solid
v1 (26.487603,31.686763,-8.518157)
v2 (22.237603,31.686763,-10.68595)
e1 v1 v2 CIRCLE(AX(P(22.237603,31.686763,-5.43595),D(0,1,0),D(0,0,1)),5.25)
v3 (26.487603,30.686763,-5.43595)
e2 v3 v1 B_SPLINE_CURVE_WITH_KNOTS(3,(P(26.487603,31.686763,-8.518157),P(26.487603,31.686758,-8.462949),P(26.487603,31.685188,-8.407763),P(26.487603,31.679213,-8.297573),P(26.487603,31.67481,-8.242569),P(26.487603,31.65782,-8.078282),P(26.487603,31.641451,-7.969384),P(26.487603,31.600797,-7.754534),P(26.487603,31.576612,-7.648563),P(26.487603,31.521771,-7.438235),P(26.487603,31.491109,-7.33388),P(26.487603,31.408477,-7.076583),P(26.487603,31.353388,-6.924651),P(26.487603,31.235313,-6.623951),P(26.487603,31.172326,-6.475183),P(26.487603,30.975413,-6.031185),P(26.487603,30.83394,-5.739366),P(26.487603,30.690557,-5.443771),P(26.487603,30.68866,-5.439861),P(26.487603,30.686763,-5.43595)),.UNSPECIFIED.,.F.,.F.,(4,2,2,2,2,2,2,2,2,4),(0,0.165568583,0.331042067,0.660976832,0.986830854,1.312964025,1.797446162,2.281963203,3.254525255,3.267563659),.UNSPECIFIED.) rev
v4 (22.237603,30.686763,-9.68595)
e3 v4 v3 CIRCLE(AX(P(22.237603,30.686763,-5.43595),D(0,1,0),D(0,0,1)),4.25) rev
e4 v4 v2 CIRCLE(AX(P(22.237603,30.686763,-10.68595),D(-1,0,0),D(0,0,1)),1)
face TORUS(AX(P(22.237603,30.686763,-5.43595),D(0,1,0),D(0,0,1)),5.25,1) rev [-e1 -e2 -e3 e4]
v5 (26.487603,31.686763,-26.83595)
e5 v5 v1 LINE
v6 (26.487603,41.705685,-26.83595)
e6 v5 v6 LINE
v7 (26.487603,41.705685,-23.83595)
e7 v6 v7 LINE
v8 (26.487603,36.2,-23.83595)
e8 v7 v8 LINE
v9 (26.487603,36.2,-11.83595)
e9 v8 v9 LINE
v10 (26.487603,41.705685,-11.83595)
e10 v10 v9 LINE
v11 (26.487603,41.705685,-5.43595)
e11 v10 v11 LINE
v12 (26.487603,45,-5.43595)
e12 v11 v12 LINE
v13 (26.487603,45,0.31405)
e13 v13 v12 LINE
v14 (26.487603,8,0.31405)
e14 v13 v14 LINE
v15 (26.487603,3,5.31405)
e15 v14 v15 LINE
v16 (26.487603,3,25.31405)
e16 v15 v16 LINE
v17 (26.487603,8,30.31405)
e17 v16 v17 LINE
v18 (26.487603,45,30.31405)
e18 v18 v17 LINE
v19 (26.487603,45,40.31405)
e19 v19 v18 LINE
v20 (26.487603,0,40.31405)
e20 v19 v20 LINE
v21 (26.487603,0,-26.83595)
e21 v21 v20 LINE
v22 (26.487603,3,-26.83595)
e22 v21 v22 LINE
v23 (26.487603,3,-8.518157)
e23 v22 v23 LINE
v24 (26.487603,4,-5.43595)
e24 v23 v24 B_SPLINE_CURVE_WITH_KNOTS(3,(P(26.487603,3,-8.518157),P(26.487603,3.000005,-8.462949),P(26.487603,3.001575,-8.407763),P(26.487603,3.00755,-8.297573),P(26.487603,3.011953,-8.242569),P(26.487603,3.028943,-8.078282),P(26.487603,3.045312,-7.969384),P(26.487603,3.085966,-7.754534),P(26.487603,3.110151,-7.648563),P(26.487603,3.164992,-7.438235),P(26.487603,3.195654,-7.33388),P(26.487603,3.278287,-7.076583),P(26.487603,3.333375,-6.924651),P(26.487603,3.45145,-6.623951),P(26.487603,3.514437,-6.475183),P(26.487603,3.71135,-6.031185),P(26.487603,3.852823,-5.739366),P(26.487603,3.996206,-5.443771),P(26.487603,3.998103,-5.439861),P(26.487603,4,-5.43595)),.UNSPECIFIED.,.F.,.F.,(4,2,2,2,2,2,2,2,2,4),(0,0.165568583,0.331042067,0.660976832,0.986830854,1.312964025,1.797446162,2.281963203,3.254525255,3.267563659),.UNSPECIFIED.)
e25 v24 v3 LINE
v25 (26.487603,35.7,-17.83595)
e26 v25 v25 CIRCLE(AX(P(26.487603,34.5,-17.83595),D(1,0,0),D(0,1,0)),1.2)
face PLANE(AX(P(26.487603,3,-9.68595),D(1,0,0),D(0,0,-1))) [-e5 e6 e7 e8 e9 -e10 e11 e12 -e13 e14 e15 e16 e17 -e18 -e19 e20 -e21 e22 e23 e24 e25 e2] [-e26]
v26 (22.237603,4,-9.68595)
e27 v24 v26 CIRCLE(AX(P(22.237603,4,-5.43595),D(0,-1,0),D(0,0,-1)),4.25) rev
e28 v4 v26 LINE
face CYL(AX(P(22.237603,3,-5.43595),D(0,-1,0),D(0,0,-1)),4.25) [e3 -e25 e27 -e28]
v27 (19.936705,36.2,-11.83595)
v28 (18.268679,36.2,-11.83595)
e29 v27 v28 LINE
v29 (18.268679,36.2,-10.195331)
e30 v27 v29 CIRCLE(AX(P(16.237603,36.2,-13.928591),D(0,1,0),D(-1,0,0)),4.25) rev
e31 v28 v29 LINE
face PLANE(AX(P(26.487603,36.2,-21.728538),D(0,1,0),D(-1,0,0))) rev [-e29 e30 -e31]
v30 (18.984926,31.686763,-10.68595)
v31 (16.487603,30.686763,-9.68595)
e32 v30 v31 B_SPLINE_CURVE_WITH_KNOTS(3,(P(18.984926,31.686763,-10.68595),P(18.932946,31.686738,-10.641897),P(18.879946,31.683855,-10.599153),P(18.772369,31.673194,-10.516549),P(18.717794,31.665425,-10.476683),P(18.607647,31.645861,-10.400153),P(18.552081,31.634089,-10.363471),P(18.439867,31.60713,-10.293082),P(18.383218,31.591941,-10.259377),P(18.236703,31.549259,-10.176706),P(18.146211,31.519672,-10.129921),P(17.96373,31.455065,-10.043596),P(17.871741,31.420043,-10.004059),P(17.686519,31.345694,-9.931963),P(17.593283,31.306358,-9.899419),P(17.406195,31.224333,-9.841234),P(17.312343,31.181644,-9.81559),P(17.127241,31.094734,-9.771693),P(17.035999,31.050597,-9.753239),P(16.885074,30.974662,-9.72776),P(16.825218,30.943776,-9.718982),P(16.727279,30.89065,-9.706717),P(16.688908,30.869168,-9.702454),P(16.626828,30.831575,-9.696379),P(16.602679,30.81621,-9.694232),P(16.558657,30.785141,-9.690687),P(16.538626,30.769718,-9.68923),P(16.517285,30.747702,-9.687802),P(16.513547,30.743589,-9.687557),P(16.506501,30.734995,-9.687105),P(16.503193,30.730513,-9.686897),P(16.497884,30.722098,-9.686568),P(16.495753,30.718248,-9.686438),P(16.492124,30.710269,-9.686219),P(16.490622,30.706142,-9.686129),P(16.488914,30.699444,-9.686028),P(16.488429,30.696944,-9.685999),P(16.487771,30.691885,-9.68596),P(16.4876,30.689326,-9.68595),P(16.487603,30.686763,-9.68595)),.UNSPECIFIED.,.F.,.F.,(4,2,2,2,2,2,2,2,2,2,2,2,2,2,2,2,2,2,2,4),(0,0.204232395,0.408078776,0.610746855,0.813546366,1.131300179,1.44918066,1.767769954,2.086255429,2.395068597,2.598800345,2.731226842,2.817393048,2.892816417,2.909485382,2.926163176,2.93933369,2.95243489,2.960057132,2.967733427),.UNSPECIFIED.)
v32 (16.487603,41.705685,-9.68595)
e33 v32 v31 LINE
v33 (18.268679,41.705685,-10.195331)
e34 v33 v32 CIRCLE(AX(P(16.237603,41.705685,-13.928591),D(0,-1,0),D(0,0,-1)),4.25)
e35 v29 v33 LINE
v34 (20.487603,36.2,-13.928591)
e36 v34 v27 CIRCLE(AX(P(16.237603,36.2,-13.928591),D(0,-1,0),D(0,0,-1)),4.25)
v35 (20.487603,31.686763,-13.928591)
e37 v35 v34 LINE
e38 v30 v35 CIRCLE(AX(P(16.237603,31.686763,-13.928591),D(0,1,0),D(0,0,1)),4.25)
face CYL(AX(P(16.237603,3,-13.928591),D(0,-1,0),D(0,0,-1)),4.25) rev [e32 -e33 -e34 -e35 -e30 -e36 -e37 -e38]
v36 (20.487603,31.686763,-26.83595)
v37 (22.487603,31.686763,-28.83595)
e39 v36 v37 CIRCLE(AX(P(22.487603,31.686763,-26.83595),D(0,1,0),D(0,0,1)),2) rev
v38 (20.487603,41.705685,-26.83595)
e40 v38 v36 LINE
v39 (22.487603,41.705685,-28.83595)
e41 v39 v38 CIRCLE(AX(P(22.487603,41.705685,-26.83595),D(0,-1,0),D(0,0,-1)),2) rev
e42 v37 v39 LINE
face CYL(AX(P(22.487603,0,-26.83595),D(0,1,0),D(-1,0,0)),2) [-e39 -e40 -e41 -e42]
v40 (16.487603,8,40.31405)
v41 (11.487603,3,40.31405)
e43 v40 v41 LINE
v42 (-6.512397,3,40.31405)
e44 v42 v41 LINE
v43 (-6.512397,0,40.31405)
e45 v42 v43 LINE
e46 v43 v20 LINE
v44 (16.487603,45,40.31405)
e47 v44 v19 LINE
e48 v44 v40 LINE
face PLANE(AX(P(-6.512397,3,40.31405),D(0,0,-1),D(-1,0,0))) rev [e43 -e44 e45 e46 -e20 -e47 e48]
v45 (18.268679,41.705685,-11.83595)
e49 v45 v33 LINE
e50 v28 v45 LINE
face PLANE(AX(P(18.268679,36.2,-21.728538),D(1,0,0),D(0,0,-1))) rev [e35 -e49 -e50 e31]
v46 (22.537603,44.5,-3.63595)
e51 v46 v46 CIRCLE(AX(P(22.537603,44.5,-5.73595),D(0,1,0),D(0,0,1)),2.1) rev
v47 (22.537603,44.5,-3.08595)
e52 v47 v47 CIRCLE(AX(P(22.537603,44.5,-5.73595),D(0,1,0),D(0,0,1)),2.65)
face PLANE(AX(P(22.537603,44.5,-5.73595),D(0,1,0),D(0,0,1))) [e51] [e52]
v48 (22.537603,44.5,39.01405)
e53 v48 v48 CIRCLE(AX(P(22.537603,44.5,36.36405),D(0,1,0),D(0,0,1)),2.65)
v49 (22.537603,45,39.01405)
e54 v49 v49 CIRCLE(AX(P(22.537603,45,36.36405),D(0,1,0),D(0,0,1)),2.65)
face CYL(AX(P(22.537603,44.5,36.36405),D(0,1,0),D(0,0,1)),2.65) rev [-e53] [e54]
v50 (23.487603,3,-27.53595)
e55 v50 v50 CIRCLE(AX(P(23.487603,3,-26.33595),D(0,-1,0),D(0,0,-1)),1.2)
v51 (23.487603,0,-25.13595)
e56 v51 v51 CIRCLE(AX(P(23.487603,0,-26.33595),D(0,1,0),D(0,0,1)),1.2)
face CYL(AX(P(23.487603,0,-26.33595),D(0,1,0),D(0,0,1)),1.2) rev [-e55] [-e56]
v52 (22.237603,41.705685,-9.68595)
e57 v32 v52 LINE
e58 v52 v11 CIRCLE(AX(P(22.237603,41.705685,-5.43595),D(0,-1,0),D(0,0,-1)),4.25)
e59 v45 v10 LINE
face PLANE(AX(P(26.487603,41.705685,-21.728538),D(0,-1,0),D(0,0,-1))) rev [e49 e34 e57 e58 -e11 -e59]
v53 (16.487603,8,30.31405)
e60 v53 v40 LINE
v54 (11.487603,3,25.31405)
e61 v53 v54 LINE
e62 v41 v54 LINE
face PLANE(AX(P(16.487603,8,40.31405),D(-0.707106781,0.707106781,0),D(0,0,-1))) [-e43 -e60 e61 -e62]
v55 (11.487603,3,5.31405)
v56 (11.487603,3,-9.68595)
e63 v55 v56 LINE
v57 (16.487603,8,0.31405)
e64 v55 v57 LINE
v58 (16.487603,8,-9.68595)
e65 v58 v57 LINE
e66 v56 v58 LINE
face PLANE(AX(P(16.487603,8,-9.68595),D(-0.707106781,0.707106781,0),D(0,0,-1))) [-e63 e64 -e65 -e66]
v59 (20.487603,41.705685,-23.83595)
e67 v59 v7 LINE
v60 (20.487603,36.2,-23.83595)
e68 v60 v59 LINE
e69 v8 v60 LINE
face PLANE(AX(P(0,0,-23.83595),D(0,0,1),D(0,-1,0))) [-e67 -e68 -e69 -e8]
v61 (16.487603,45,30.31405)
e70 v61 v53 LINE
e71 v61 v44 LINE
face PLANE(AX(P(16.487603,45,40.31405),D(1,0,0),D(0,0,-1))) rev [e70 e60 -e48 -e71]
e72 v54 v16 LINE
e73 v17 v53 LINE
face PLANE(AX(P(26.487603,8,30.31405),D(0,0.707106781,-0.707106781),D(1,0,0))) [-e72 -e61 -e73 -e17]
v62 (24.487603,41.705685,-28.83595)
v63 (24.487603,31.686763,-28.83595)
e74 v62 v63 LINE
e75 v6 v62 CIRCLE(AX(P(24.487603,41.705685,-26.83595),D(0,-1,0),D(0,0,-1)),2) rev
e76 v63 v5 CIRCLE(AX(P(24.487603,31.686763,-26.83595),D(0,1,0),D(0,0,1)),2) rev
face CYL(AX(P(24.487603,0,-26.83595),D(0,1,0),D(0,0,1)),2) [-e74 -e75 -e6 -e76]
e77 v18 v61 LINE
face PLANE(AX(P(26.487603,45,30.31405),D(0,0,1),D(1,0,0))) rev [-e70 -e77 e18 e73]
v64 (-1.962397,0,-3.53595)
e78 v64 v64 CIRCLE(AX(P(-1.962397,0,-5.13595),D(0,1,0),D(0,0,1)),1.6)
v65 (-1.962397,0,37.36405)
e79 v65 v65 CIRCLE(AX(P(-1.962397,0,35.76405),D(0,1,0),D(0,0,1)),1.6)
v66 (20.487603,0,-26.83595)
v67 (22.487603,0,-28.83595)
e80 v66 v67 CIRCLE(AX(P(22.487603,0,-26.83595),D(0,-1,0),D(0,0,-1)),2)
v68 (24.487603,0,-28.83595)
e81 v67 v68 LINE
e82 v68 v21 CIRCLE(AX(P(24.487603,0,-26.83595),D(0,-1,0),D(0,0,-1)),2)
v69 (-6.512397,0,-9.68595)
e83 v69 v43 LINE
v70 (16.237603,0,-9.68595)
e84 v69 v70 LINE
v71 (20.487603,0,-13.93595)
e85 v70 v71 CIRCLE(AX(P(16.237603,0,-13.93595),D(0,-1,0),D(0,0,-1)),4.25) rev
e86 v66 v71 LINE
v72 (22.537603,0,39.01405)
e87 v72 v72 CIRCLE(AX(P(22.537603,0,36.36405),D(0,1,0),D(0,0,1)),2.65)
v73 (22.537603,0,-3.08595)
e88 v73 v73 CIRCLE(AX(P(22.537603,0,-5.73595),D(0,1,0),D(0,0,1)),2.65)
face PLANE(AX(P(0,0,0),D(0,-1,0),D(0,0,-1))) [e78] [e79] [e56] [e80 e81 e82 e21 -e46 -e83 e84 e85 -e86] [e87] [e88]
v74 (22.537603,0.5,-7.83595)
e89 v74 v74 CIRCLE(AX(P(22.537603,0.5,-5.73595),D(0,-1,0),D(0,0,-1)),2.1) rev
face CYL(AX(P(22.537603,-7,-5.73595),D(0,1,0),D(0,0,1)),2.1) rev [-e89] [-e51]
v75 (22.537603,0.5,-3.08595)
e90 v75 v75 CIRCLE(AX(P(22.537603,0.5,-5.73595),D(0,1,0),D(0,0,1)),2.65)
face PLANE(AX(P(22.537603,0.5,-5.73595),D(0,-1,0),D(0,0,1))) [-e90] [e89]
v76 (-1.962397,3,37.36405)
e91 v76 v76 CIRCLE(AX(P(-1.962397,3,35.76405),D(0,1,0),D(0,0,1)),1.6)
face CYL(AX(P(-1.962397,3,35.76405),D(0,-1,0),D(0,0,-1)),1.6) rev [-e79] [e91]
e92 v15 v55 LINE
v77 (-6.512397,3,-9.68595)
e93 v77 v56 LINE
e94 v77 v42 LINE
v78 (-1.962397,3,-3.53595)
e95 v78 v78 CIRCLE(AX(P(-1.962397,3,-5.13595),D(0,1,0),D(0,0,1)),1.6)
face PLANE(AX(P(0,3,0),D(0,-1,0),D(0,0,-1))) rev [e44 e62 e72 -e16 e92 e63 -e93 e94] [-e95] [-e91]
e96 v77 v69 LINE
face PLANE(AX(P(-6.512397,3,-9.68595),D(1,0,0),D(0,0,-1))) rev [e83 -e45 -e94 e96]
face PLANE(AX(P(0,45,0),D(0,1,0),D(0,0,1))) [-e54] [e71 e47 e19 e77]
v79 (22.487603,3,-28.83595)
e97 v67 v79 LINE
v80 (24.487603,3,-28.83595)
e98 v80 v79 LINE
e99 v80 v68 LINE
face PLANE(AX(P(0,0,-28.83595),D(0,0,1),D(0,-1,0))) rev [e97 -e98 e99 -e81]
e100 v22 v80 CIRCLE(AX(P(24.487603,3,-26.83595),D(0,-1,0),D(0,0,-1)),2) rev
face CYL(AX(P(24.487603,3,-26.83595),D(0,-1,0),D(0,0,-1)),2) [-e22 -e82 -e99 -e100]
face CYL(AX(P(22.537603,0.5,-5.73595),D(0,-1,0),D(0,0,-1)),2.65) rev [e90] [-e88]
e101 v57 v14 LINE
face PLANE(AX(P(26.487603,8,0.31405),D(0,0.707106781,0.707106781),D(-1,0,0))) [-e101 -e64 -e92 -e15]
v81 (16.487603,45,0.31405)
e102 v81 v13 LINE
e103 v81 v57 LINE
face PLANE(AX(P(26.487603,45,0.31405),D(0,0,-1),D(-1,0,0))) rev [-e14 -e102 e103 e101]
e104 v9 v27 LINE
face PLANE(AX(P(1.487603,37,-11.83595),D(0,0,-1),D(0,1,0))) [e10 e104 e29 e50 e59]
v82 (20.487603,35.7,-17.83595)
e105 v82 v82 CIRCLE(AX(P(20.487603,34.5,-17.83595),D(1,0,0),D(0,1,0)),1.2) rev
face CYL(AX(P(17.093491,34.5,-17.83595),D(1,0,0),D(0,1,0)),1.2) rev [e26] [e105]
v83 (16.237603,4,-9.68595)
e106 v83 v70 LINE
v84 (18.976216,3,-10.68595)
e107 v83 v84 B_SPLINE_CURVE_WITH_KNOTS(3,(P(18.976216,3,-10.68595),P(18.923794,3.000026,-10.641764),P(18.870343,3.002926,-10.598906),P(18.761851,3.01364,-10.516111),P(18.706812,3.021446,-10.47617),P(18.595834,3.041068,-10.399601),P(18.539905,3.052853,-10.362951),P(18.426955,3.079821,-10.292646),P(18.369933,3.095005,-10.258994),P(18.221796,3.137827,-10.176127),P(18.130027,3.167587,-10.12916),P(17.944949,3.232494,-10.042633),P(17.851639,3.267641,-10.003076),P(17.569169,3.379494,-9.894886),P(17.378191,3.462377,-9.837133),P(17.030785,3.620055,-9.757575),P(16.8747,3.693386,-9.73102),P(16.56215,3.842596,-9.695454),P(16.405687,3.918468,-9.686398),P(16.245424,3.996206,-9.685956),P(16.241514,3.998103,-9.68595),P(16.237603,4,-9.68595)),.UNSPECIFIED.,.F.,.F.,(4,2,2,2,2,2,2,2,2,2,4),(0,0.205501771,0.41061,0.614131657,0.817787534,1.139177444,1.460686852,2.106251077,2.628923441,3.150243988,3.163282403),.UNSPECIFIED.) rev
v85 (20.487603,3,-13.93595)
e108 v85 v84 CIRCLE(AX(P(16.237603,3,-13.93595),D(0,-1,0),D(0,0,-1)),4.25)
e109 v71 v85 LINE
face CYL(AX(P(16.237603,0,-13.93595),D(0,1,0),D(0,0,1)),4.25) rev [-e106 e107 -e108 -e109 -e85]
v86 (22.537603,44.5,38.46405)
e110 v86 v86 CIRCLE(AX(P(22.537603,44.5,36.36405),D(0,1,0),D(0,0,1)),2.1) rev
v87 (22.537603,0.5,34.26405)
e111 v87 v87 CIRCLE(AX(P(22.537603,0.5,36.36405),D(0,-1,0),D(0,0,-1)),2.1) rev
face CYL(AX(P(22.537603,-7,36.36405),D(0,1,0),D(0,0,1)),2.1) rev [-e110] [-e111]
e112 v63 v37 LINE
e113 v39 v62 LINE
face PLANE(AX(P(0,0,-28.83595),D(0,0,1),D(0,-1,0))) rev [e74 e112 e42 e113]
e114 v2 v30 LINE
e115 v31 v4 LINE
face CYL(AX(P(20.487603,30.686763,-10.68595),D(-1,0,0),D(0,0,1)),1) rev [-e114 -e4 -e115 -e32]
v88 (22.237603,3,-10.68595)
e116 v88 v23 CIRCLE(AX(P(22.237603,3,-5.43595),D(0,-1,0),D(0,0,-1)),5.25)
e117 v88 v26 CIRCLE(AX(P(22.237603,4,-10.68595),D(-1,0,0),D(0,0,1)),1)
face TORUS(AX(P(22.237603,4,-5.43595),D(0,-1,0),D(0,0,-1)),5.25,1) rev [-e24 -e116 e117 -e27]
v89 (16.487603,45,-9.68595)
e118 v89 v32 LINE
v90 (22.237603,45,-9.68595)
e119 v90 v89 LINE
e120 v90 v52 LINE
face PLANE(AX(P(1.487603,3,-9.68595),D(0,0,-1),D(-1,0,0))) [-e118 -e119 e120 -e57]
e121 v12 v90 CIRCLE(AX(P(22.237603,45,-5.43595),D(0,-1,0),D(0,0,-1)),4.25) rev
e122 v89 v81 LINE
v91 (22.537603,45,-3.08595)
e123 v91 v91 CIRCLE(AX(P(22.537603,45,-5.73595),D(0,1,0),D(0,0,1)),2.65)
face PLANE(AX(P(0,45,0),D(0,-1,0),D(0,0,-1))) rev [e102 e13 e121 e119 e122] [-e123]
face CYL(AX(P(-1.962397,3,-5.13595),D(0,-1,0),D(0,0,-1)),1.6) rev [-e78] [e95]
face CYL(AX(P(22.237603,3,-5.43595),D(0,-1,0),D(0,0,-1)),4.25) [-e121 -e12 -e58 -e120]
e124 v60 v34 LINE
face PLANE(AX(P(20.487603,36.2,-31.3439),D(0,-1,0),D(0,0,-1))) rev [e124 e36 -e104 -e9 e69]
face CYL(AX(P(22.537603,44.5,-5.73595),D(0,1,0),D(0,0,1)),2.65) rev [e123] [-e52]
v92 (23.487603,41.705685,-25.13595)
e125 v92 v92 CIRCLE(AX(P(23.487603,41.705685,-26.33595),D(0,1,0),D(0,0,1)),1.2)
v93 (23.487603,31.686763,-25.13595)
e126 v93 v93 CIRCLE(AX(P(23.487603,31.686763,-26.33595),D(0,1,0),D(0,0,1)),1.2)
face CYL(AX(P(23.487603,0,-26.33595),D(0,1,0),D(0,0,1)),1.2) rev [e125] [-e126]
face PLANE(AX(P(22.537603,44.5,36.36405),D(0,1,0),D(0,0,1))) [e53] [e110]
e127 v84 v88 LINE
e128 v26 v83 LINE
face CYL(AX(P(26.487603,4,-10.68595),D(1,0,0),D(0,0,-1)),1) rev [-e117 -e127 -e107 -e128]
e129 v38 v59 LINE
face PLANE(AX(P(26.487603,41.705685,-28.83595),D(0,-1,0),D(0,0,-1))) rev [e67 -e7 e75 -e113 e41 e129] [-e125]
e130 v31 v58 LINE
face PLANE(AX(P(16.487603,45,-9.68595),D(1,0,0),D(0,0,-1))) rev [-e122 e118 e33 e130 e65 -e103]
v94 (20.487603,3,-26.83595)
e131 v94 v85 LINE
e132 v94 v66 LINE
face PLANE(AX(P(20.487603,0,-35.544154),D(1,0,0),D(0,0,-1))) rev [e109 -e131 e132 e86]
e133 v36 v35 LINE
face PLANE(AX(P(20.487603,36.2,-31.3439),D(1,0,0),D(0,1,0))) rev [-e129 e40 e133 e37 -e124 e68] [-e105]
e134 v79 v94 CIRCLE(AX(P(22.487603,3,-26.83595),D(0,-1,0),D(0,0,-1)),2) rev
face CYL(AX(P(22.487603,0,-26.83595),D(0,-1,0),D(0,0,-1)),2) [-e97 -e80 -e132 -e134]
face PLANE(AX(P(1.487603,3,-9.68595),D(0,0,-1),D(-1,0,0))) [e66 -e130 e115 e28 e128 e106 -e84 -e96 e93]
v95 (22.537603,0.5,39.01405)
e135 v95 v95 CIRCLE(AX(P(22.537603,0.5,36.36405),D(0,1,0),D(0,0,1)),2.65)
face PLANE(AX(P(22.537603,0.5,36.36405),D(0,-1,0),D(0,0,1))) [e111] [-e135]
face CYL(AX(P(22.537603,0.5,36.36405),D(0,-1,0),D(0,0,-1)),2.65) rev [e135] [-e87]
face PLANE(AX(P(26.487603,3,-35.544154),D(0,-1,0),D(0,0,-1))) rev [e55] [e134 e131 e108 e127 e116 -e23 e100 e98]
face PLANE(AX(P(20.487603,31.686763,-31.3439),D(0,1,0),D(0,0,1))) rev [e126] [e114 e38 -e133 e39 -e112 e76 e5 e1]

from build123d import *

# Parameters (mm, degrees)
SKETCH1_R           = 1.5999999999999974
SKETCH1_R_2         = 1.6
BOSS_EXTRUDE1_DEPTH = 3
SKETCH2_W           = 10.000000000000004
SKETCH2_H           = 10.000000000000004
BOSS_EXTRUDE2_DEPTH = 42
CHAMFER1_SIZE       = 5
SKETCH3_R           = 2.1
SKETCH3_R_2         = 2.1000000000000005
CUT_EXTRUDE1_DEPTH  = 52.00000000000001
SKETCH4_R           = 2.65
SKETCH4_R_2         = 2.6500000000000004
CUT_EXTRUDE2_DEPTH  = 0.5
BOSS_EXTRUDE3_DEPTH = 14.15
SKETCH6_R           = 1.2000000000000004
CUT_EXTRUDE3_DEPTH  = 6
SKETCH7_W           = 6
SKETCH7_H           = 10.018921584932333
BOSS_EXTRUDE4_DEPTH = 5
BOSS_EXTRUDE5_DEPTH = 2.15
SKETCH9_W           = 6
SKETCH9_H           = 3
BOSS_EXTRUDE6_DEPTH = 19.15
SKETCH10_R          = 1.2000000000000004
CUT_EXTRUDE4_DEPTH  = 64.7666045986287
FILLET3_R           = 2
FILLET4_R           = 4.25
FILLET5_R           = 4.25
FILLET6_R           = 4.25
FILLET7_R           = 4.25
FILLET8_R           = 1
FILLET9_R           = 1


with BuildPart() as part:
    # Sketch1 → Boss-Extrude1 (new body)
    with BuildSketch(Plane(origin=(0, 0, 0), x_dir=(1, 0, 0), z_dir=(0, 1, 0))):
        Polygon((-6.5123966942148765, 9.68595041322314), (1.487603305785124, 9.68595041322314), (26.48760330578513, 9.68595041322314), (26.487603305785132, -40.31404958677687), (1.4876033057851312, -40.31404958677687), (-6.512396694214871, -40.31404958677687), align=None)
        with Locations(Location((-1.962396694214872, -35.76404958677687, 0), (0, 0, 270))):
            Circle(SKETCH1_R, mode=Mode.SUBTRACT)
        with Locations(Location((-1.9623966942148756, 5.135950413223139, 0), (0, 0, 270))):
            Circle(SKETCH1_R_2, mode=Mode.SUBTRACT)
    extrude(amount=BOSS_EXTRUDE1_DEPTH)

    # Sketch2 → Boss-Extrude2 (add)
    with BuildSketch(Plane(origin=(0, 3, 0), x_dir=(1, 0, 0), z_dir=(0, 1, 0))):
        with Locations((21.48760330578513, -35.31404958677687)):
            Rectangle(SKETCH2_W, SKETCH2_H)
        Polygon((26.48760330578513, 9.68595041322314), (16.48760330578513, 9.685950413223138), (16.487603305785125, -0.314049586776863), (26.48760330578513, -0.31404958677686173), align=None)
    extrude(amount=BOSS_EXTRUDE2_DEPTH)

    # Chamfer1
    chamfer1_edges = [part.edges().sort_by_distance(p)[0] for p in [
        (21.48760330578513, 3, 30.314049586776864),
        (16.48760330578513, 3, 35.31404958677687),
        (16.48760330578513, 3, -4.6859504132231375),
        (21.48760330578513, 3, 0.31404958677686234),
    ]]
    chamfer(chamfer1_edges, length=CHAMFER1_SIZE)

    # Sketch3 → Cut-Extrude1 (cut)
    with BuildSketch(Plane(origin=(0, 45.00000000000001, 0), x_dir=(1, 0, 0), z_dir=(0, 1, 0))):
        with Locations(Location((22.53760330578513, -36.364049586776865, 0), (0, 0, 270))):
            Circle(SKETCH3_R)
        with Locations(Location((22.53760330578513, 5.735950413223138, 0), (0, 0, 270))):
            Circle(SKETCH3_R_2)
    extrude(amount=-CUT_EXTRUDE1_DEPTH, mode=Mode.SUBTRACT)

    # Sketch4 → Cut-Extrude2 (cut)
    with BuildSketch(Plane(origin=(0, 45.00000000000001, 0), x_dir=(1, 0, 0), z_dir=(0, 1, 0))):
        with Locations(Location((22.53760330578513, -36.364049586776865, 0), (0, 0, 270))):
            Circle(SKETCH4_R)
        with Locations(Location((22.53760330578513, 5.735950413223138, 0), (0, 0, 270))):
            Circle(SKETCH4_R_2)
    cut_extrude2 = extrude(amount=-CUT_EXTRUDE2_DEPTH, mode=Mode.SUBTRACT)

    # Mirror1: Cut-Extrude2 across plane
    add(cut_extrude2.mirror(Plane(origin=(0, 22.500000000000004, 0), x_dir=(0, 0, 1), z_dir=(0, -1, 0))), mode=Mode.SUBTRACT)

    # Sketch5 → Boss-Extrude3 (add)
    with BuildSketch(Plane(origin=(0, 0, -9.68595041322314), x_dir=(-1, 0, 0), z_dir=(0, 0, -1))):
        Polygon((-20.487603305785136, 36.20000000000077), (-26.487603305785136, 36.20000000000077), (-26.487603305785132, 31.68676314830412), (-20.487603305785132, 31.68676314830412), align=None)
    extrude(amount=BOSS_EXTRUDE3_DEPTH)

    # Sketch6 → Cut-Extrude3 (cut)
    with BuildSketch(Plane(origin=(26.48760330578513, 0, -1.84e-15), x_dir=(0, 0, -1), z_dir=(1, -7.7e-16, 0))):
        with Locations(Location((17.835950413222832, 34.50000000000082, 0), (0, 0, 90))):
            Circle(SKETCH6_R)
    extrude(amount=-CUT_EXTRUDE3_DEPTH, mode=Mode.SUBTRACT)

    # Sketch7 → Boss-Extrude4 (add)
    with BuildSketch(Plane(origin=(1.35e-15, 1.098e-14, -23.835950413222633), x_dir=(-1, 0, -6e-17), z_dir=(6e-17, 4.6e-16, -1))):
        with Locations((-23.487603305785132, 36.696223940770274)):
            Rectangle(SKETCH7_W, SKETCH7_H)
    extrude(amount=BOSS_EXTRUDE4_DEPTH)

    # Sketch8 → Boss-Extrude5 (add)
    with BuildSketch(Plane(origin=(0, 0, -9.68595041322314), x_dir=(-1, 0, 0), z_dir=(0, 0, -1))):
        Polygon((-26.487603305785136, 36.20000000000077), (-18.268679093182527, 36.2000000000008), (-18.268679093182527, 41.70568473323645), (-26.487603305785136, 41.70568473323645), align=None)
    extrude(amount=BOSS_EXTRUDE5_DEPTH)

    # Sketch9 → Boss-Extrude6 (add)
    with BuildSketch(Plane(origin=(0, 0, -9.68595041322314), x_dir=(-1, 0, 0), z_dir=(0, 0, -1))):
        with Locations((-23.487603305785132, 1.5)):
            Rectangle(SKETCH9_W, SKETCH9_H)
    extrude(amount=BOSS_EXTRUDE6_DEPTH)

    # Sketch10 → Cut-Extrude4 (cut, through all)
    with BuildSketch(Plane(origin=(0, 41.70568473323644, 1.921e-14), x_dir=(1, 0, 0), z_dir=(0, 1, 4.6e-16))):
        with Locations(Location((23.487603305785132, 26.335950413222633, 0), (0, 0, 270))):
            Circle(SKETCH10_R)
    extrude(amount=-CUT_EXTRUDE4_DEPTH, mode=Mode.SUBTRACT)

    # Fillet3
    fillet3_edges = [part.edges().sort_by_distance(p)[0] for p in [
        (26.487603305785132, 36.69622394077029, -28.835950413222616),
        (20.487603305785132, 36.69622394077029, -28.835950413222616),
        (20.487603305785132, 1.5, -28.835950413223138),
        (26.487603305785132, 1.5, -28.835950413223138),
    ]]
    fillet(fillet3_edges, radius=FILLET3_R)

    # Fillet4
    fillet4_edges = [part.edges().sort_by_distance(p)[0] for p in [
        (26.48760330578513, 17.343381574152062, -9.68595041322314),
    ]]
    fillet(fillet4_edges, radius=FILLET4_R)

    # Fillet5
    fillet5_edges = [part.edges().sort_by_distance(p)[0] for p in [
        (20.487603305785132, 1.5, -9.68595041322314),
    ]]
    fillet(fillet5_edges, radius=FILLET5_R)

    # Fillet6
    fillet6_edges = [part.edges().sort_by_distance(p)[0] for p in [
        (26.48760330578513, 43.352842366618226, -9.68595041322314),
    ]]
    fillet(fillet6_edges, radius=FILLET6_R)

    # Fillet7
    # the kernel refuses this fillet: 4.25 mm, written as the material it adds along each edge
    with BuildSketch(Plane(origin=(20.487603305785132, 31.68676314830412, -9.68595041322314), x_dir=(-1, 7.9e-16, 8.9e-16), z_dir=(7.9e-16, 1, 0))) as fillet7_piece_1:
        with BuildLine():
            CenterArc((4.2499999999999964, -4.242640687119286), FILLET7_R, 93.37228668343381, 86.62771331656613)
            Line((-3.77e-15, -4.242640687119282), (0, 0))
            Line((0, 0), (4.0000000000000036, 0))
        make_face()
    extrude(amount=4.51323685169665)
    with BuildSketch(Plane(origin=(20.48760330578512, 21.08016143050591, -9.68595041322314), x_dir=(-1, 7.9e-16, 0), z_dir=(7.9e-16, 1, 0))) as fillet7_piece_2_section:
        with BuildLine():
            CenterArc((4.2499999999999964, -4.242640687119284), FILLET7_R, 93.37228668343396, 86.62771331656604)
            Line((-3.55e-15, -4.242640687119284), (0, 0))
            Line((0, 0), (3.999999999999993, 0))
        make_face()
    fillet7_piece_2 = extrude(amount=25.726440287293073, mode=Mode.PRIVATE)
    fillet7_piece_2 = split(fillet7_piece_2, bisect_by=Plane(origin=(17.40856960112635, 36.2000000000008, -9.834246197287131), z_dir=(3.46e-15, 1, 0)), keep=Keep.TOP, mode=Mode.PRIVATE)
    fillet7_piece_2 = split(fillet7_piece_2, bisect_by=Plane(origin=(18.268679093182527, 38.95284236661862, -9.834246197287131), z_dir=(-1, 0, 0)), keep=Keep.TOP, mode=Mode.PRIVATE)
    fillet7_piece_2 = split(fillet7_piece_2, bisect_by=Plane(origin=(17.40856960112636, 41.70568473323645, -9.834246197287131), z_dir=(0, -1, 0)), keep=Keep.TOP, mode=Mode.PRIVATE)
    add(fillet7_piece_2)

    # Fillet8
    fillet8_edges = [part.edges().sort_by_distance(p)[0] for p in [
        (19.23760330578513, 3, -9.68595041322314),
        (25.242807125827955, 3, -8.441154233265967),
    ]]
    fillet(fillet8_edges, radius=FILLET8_R)

    # Fillet9
    # the kernel refuses this fillet: 1 mm, written as the material it adds along each edge
    with BuildSketch(Plane(origin=(22.23760330578513, 31.68676314830412, -9.68595041322314), x_dir=(2.101e-14, -1, 0), z_dir=(-1, -2.101e-14, 4.881e-14))) as fillet9_piece_1_section:
        with BuildLine():
            CenterArc((FILLET9_R, -FILLET9_R), FILLET9_R, 90, 90)
            Line((0, -FILLET9_R), (0, 0))
            Line((0, 0), (FILLET9_R, 0))
        make_face()
    fillet9_piece_1 = extrude(amount=5.750000000000124, mode=Mode.PRIVATE)
    fillet9_piece_1 = fillet9_piece_1 - Plane(origin=(16.237603305785, 31.449849305224696, -13.928591100342), x_dir=(-1, 0, 0), z_dir=(0, -1, 0)) * Cylinder(4.25, 16, mode=Mode.PRIVATE)
    add(fillet9_piece_1)
    with BuildSketch(Plane(origin=(22.23760330578513, 31.68676314830412, -5.43595041322314), x_dir=(0, 0, -1), z_dir=(-1, 0, 0))) as fillet9_piece_2_section:
        with BuildLine():
            CenterArc((4.249999999999999 + FILLET9_R, FILLET9_R), FILLET9_R, 180.00000000000693, 89.99999999999307)
            Line((4.249999999999999, FILLET9_R), (4.249999999999999, 0))
            Line((4.249999999999999, 0), (4.249999999999999 + FILLET9_R, 1.2079e-13))
        make_face()
    fillet9_piece_2 = revolve(axis=Axis((22.23760330578513, 31.68676314830412, -5.43595041322314), (0, -1, 0)), revolution_arc=123.71693864409282, mode=Mode.PRIVATE)
    fillet9_piece_2 = split(fillet9_piece_2, bisect_by=Plane(origin=(26.48760330578513, 31.521836885030236, -9.895455596994594), z_dir=(-1, 0, 7e-17)), keep=Keep.TOP, mode=Mode.PRIVATE)
    add(fillet9_piece_2)


solid = part.part
